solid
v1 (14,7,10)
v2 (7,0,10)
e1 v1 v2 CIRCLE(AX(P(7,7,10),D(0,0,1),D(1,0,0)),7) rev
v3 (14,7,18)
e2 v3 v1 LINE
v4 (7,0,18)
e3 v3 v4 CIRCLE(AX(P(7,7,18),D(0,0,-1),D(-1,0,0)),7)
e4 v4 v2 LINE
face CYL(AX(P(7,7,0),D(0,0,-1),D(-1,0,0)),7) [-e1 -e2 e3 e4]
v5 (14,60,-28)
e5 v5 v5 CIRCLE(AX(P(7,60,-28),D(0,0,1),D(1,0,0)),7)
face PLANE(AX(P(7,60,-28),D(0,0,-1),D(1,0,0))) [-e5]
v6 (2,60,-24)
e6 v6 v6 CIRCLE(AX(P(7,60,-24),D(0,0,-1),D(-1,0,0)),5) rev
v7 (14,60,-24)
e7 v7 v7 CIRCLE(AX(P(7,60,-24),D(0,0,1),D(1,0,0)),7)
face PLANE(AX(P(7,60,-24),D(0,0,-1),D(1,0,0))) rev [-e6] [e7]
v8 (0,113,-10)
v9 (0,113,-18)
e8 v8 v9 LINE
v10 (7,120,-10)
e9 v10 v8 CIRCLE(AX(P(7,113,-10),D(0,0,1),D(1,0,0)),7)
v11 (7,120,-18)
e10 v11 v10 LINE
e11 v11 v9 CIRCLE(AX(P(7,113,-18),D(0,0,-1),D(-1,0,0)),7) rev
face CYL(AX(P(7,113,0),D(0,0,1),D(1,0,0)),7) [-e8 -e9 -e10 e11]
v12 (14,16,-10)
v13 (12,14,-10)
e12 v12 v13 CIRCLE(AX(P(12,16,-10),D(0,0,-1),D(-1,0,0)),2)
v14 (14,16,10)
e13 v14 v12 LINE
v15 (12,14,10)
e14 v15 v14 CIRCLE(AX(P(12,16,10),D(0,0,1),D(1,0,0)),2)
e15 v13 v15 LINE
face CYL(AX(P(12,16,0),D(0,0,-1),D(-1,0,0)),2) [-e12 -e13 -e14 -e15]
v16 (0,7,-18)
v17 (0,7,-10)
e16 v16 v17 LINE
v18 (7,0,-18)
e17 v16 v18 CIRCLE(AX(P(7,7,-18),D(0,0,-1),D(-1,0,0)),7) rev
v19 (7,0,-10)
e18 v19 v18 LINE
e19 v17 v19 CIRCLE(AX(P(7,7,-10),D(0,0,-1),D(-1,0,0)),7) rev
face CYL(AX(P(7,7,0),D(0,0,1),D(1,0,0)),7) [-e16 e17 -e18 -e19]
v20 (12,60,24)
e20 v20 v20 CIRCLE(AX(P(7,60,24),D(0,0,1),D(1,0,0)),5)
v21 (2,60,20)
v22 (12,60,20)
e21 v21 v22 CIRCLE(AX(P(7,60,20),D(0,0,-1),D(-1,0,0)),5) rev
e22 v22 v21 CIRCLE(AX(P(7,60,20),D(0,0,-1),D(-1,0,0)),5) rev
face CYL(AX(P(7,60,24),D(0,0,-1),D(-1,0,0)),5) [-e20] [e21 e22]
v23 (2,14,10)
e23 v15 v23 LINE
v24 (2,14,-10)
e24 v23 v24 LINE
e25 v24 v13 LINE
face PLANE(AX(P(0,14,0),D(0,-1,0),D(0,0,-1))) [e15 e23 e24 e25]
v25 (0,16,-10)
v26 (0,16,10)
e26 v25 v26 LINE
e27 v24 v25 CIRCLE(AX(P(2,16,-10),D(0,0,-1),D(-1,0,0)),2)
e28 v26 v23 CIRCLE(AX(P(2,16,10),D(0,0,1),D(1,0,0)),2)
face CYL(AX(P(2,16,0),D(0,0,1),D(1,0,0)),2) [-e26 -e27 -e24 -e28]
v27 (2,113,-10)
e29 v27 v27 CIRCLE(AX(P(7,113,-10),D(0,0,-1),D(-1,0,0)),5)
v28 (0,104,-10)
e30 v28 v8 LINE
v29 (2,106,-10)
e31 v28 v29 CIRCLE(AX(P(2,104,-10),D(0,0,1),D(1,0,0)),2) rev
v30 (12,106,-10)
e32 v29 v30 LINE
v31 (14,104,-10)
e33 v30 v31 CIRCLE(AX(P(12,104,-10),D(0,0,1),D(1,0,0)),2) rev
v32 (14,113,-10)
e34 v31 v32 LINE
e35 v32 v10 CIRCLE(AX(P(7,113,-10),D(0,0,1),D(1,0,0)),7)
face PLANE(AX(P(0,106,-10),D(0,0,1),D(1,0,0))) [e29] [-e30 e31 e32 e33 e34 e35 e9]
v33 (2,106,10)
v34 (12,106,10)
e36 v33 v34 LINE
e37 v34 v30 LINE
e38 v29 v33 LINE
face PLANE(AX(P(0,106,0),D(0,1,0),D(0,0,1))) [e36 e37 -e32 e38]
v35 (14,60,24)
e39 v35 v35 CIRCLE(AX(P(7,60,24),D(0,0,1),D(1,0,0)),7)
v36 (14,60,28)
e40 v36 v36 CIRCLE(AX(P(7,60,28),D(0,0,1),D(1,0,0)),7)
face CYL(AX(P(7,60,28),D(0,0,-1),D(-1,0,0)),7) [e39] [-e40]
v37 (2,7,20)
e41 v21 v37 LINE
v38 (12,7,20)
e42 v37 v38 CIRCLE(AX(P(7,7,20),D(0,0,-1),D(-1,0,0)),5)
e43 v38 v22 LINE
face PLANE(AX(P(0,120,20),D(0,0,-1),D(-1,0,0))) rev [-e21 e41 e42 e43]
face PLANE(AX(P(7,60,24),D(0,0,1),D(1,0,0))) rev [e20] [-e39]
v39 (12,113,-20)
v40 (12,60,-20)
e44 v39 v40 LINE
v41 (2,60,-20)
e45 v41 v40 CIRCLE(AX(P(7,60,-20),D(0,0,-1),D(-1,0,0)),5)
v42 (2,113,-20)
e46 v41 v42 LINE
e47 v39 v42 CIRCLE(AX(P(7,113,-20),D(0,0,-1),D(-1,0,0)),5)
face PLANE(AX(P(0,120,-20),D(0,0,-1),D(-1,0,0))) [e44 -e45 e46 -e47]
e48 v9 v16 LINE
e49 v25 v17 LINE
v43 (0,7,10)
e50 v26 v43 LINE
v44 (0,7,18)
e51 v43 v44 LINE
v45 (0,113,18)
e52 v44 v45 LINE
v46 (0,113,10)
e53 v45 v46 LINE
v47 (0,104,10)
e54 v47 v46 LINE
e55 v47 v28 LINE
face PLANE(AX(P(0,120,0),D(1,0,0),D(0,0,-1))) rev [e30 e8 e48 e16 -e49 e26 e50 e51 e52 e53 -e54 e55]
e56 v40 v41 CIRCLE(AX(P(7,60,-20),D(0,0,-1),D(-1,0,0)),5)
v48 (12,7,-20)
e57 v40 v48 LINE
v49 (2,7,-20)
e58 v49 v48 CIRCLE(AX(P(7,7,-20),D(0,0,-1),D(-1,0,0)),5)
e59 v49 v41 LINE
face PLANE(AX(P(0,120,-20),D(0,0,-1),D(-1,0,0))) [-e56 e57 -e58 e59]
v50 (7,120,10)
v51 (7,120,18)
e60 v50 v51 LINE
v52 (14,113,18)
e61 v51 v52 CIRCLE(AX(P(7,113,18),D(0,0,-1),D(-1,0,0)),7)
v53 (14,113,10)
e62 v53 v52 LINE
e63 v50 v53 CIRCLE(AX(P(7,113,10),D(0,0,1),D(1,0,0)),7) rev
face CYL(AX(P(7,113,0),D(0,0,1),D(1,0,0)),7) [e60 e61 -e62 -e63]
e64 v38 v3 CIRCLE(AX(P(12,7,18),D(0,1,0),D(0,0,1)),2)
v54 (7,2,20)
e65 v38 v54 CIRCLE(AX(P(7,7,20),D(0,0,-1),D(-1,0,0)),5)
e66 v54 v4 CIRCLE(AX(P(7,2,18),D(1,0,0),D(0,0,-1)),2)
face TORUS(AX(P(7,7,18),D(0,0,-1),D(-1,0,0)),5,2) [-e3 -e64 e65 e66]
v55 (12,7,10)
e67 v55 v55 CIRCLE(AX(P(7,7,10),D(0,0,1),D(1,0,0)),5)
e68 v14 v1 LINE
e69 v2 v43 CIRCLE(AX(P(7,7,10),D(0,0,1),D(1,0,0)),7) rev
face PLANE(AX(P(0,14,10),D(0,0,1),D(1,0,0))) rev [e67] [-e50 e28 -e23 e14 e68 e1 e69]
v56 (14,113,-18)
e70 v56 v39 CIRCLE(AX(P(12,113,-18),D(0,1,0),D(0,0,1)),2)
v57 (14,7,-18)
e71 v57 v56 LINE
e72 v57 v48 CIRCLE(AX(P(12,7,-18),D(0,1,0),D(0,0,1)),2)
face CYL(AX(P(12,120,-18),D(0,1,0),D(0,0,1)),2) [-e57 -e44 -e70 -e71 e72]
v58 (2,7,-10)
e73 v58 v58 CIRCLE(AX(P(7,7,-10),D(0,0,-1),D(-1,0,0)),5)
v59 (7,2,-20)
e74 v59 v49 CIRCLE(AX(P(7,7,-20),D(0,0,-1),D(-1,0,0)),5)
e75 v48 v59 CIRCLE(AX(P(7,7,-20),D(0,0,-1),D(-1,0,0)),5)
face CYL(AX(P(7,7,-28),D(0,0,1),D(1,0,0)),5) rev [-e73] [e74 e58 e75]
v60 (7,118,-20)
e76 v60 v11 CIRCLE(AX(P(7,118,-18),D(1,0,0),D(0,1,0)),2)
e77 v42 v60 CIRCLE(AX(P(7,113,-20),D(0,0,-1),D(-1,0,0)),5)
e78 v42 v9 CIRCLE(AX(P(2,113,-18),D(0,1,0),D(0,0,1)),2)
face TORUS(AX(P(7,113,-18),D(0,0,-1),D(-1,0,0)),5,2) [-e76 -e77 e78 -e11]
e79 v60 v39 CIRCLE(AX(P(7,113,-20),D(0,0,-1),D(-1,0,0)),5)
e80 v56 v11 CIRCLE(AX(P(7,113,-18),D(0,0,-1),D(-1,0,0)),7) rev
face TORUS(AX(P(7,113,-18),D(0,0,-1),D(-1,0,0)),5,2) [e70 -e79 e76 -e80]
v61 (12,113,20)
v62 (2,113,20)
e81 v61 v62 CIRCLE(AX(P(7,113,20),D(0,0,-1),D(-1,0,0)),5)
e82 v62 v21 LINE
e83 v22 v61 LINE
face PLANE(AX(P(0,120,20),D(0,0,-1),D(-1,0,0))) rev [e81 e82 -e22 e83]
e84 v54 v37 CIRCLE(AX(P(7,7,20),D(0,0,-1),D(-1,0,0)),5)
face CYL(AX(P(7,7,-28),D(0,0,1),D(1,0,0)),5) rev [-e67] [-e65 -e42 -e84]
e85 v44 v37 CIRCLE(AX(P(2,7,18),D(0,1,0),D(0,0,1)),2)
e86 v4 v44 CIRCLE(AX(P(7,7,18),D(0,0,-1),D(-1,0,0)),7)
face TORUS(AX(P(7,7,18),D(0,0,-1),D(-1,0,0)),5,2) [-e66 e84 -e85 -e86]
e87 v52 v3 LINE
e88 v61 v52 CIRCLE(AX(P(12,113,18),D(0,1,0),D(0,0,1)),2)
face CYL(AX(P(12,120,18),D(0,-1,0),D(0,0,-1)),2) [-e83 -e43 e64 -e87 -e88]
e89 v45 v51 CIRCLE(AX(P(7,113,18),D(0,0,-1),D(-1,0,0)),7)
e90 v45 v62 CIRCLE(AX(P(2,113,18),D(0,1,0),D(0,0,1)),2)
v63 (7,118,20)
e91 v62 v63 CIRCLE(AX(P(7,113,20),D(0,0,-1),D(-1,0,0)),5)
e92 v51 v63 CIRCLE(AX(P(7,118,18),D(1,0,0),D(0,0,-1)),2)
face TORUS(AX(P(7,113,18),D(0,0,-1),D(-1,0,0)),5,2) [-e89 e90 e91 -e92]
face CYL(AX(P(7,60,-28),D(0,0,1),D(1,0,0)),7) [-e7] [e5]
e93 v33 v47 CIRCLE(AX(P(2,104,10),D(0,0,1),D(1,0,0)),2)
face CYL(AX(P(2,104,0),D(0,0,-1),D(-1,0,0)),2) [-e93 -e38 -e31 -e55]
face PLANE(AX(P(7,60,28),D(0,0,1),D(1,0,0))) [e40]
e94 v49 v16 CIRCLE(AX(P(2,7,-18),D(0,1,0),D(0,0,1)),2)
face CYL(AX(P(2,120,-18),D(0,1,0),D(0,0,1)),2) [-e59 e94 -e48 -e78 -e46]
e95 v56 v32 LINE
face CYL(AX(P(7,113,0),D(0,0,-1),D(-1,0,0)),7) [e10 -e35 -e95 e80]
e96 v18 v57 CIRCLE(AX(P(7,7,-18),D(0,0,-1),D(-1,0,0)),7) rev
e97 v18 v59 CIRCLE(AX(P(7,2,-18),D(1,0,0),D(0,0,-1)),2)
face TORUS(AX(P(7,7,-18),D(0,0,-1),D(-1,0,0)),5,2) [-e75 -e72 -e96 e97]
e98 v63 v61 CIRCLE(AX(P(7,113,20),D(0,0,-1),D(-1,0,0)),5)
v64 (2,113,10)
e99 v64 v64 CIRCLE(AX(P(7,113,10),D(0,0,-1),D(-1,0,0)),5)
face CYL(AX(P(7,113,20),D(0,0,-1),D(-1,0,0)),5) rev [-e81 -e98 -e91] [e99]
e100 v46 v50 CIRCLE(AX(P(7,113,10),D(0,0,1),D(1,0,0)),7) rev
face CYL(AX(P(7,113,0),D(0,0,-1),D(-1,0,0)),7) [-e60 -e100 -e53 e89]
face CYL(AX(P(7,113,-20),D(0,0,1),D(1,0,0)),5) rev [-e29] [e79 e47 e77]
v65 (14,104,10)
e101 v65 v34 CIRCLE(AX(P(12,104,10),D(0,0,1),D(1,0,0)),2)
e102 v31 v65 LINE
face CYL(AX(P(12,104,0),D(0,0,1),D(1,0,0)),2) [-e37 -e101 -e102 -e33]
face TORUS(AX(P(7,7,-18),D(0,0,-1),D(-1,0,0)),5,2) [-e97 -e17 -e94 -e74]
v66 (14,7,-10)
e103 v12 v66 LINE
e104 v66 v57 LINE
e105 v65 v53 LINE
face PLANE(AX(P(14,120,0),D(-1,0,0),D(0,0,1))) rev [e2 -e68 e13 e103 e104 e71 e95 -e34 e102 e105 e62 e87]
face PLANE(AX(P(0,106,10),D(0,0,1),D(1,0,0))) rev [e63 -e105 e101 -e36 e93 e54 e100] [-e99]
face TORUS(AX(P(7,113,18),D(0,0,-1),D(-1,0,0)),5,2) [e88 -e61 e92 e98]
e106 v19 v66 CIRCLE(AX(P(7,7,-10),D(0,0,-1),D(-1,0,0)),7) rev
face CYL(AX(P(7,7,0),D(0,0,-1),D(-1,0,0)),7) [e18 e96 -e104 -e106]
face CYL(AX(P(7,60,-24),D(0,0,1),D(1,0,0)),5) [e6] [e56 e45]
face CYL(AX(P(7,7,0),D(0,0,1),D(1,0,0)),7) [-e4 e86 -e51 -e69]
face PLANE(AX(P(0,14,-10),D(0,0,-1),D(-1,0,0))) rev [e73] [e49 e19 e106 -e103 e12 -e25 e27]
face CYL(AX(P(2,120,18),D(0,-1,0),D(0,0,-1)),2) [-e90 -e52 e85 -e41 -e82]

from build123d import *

# Parameters (mm, degrees)
SKETCH1_W               = 14
SKETCH1_H               = 20
BOSS_EXTRUDE1_DEPTH     = 120
SKETCH4_W               = 14
SKETCH4_H               = 10
CUT_EXTRUDE3_DEPTH      = 14
SKETCH6_R               = 5
CUT_EXTRUDE5_DEPTH      = 10
SKETCH10_W              = 14
SKETCH10_H              = 20
CUT_EXTRUDE8_DEPTH      = 14
SKETCH12_R              = 5
BOSS_EXTRUDE2_DEPTH     = 4
SKETCH13_R              = 7
BOSS_EXTRUDE3_DEPTH     = 4
CUT_EXTRUDE9_DEPTH      = 125.016127983
CUT_EXTRUDE9_DEPTH_BACK = 125.016127983
SKETCH14_R              = 5
FILLET1_R               = 7
FILLET2_R               = 2


with BuildPart() as part:
    # Sketch1 → Boss-Extrude1 (new body)
    with BuildSketch(Plane(origin=(0, 0, 0), x_dir=(1, 0, 0), z_dir=(0, 1, 0))):
        with Locations((7, -10)):
            Rectangle(SKETCH1_W, SKETCH1_H)
    boss_extrude1 = extrude(amount=BOSS_EXTRUDE1_DEPTH)

    # Sketch4 → Cut-Extrude3 (cut)
    with BuildSketch(Plane(origin=(0, 120, 0), x_dir=(1, 0, 0), z_dir=(0, 1, 0))):
        with Locations((7, -5)):
            Rectangle(SKETCH4_W, SKETCH4_H)
    cut_extrude3 = extrude(amount=-CUT_EXTRUDE3_DEPTH, mode=Mode.SUBTRACT)

    # Sketch6 → Cut-Extrude5 (cut)
    with BuildSketch(Plane(origin=(0, 0, 10), x_dir=(-1, 0, 0), z_dir=(0, 0, -1))):
        with Locations((-7, 113)):
            Circle(SKETCH6_R)
    cut_extrude5 = extrude(amount=-CUT_EXTRUDE5_DEPTH, mode=Mode.SUBTRACT)

    # Mirror1: Boss-Extrude1, Cut-Extrude3, Cut-Extrude5 across plane
    add(boss_extrude1.mirror(Plane(origin=(0, 120, 0), x_dir=(1, 0, 0), z_dir=(0, 0, 1))))
    add(cut_extrude3.mirror(Plane(origin=(0, 120, 0), x_dir=(1, 0, 0), z_dir=(0, 0, 1))), mode=Mode.SUBTRACT)
    add(cut_extrude5.mirror(Plane(origin=(0, 120, 0), x_dir=(1, 0, 0), z_dir=(0, 0, 1))), mode=Mode.SUBTRACT)

    # Sketch10 → Cut-Extrude8 (cut)
    with BuildSketch(Plane.XZ):
        with Locations((7, 0)):
            Rectangle(SKETCH10_W, SKETCH10_H)
    extrude(amount=-CUT_EXTRUDE8_DEPTH, mode=Mode.SUBTRACT)

    # Sketch12 → Boss-Extrude2 (add)
    with BuildSketch(Plane.XY.offset(20)):
        with Locations(Location((7, 60, 0), (0, 0, 180))):
            Circle(SKETCH12_R)
    boss_extrude2 = extrude(amount=BOSS_EXTRUDE2_DEPTH)

    # Sketch13 → Boss-Extrude3 (add)
    with BuildSketch(Plane.XY.offset(24)):
        with Locations((7, 60)):
            Circle(SKETCH13_R)
    boss_extrude3 = extrude(amount=BOSS_EXTRUDE3_DEPTH)

    # Mirror3: Boss-Extrude2, Boss-Extrude3 across plane
    add(boss_extrude2.mirror(Plane.XY))
    add(boss_extrude3.mirror(Plane.XY))

    # Sketch14 → Cut-Extrude9 (cut, two sides: drawn at the far end of the back side and taken through both)
    with BuildSketch(Plane.XY.offset(-CUT_EXTRUDE9_DEPTH_BACK)):
        with Locations(Location((7, 7, 0), (0, 0, 180))):
            Circle(SKETCH14_R)
    extrude(amount=CUT_EXTRUDE9_DEPTH + CUT_EXTRUDE9_DEPTH_BACK, mode=Mode.SUBTRACT)

    # Fillet1
    fillet1_edges = [part.edges().sort_by_distance(p)[0] for p in [
        (14, 0, 15),
        (0, 0, 15),
        (14, 0, -15),
        (0, 0, -15),
        (14, 120, 15),
        (0, 120, 15),
        (0, 120, -15),
        (14, 120, -15),
    ]]
    fillet(fillet1_edges, radius=FILLET1_R - 0.0001)  # a hair under: the kernel refuses the full size

    # Fillet2
    fillet2_edges = [part.edges().sort_by_distance(p)[0] for p in [
        (14, 60, -20),
        (14, 60, 20),
        (0, 60, 20),
        (0, 60, -20),
        (0, 106, 0),
        (14, 106, 0),
        (0, 14, 0),
        (14, 14, 0),
        (2.050223242, 117.949776758, 20),
        (2.050223242, 2.050223242, 20),
        (11.949776758, 2.050223242, 20),
        (11.949776758, 117.949776758, -20),
        (2.050223242, 2.050223242, -20),
        (11.949776758, 2.050223242, -20),
    ]]
    fillet(fillet2_edges, radius=FILLET2_R - 0.0001)  # a hair under: the kernel refuses the full size


solid = part.part
